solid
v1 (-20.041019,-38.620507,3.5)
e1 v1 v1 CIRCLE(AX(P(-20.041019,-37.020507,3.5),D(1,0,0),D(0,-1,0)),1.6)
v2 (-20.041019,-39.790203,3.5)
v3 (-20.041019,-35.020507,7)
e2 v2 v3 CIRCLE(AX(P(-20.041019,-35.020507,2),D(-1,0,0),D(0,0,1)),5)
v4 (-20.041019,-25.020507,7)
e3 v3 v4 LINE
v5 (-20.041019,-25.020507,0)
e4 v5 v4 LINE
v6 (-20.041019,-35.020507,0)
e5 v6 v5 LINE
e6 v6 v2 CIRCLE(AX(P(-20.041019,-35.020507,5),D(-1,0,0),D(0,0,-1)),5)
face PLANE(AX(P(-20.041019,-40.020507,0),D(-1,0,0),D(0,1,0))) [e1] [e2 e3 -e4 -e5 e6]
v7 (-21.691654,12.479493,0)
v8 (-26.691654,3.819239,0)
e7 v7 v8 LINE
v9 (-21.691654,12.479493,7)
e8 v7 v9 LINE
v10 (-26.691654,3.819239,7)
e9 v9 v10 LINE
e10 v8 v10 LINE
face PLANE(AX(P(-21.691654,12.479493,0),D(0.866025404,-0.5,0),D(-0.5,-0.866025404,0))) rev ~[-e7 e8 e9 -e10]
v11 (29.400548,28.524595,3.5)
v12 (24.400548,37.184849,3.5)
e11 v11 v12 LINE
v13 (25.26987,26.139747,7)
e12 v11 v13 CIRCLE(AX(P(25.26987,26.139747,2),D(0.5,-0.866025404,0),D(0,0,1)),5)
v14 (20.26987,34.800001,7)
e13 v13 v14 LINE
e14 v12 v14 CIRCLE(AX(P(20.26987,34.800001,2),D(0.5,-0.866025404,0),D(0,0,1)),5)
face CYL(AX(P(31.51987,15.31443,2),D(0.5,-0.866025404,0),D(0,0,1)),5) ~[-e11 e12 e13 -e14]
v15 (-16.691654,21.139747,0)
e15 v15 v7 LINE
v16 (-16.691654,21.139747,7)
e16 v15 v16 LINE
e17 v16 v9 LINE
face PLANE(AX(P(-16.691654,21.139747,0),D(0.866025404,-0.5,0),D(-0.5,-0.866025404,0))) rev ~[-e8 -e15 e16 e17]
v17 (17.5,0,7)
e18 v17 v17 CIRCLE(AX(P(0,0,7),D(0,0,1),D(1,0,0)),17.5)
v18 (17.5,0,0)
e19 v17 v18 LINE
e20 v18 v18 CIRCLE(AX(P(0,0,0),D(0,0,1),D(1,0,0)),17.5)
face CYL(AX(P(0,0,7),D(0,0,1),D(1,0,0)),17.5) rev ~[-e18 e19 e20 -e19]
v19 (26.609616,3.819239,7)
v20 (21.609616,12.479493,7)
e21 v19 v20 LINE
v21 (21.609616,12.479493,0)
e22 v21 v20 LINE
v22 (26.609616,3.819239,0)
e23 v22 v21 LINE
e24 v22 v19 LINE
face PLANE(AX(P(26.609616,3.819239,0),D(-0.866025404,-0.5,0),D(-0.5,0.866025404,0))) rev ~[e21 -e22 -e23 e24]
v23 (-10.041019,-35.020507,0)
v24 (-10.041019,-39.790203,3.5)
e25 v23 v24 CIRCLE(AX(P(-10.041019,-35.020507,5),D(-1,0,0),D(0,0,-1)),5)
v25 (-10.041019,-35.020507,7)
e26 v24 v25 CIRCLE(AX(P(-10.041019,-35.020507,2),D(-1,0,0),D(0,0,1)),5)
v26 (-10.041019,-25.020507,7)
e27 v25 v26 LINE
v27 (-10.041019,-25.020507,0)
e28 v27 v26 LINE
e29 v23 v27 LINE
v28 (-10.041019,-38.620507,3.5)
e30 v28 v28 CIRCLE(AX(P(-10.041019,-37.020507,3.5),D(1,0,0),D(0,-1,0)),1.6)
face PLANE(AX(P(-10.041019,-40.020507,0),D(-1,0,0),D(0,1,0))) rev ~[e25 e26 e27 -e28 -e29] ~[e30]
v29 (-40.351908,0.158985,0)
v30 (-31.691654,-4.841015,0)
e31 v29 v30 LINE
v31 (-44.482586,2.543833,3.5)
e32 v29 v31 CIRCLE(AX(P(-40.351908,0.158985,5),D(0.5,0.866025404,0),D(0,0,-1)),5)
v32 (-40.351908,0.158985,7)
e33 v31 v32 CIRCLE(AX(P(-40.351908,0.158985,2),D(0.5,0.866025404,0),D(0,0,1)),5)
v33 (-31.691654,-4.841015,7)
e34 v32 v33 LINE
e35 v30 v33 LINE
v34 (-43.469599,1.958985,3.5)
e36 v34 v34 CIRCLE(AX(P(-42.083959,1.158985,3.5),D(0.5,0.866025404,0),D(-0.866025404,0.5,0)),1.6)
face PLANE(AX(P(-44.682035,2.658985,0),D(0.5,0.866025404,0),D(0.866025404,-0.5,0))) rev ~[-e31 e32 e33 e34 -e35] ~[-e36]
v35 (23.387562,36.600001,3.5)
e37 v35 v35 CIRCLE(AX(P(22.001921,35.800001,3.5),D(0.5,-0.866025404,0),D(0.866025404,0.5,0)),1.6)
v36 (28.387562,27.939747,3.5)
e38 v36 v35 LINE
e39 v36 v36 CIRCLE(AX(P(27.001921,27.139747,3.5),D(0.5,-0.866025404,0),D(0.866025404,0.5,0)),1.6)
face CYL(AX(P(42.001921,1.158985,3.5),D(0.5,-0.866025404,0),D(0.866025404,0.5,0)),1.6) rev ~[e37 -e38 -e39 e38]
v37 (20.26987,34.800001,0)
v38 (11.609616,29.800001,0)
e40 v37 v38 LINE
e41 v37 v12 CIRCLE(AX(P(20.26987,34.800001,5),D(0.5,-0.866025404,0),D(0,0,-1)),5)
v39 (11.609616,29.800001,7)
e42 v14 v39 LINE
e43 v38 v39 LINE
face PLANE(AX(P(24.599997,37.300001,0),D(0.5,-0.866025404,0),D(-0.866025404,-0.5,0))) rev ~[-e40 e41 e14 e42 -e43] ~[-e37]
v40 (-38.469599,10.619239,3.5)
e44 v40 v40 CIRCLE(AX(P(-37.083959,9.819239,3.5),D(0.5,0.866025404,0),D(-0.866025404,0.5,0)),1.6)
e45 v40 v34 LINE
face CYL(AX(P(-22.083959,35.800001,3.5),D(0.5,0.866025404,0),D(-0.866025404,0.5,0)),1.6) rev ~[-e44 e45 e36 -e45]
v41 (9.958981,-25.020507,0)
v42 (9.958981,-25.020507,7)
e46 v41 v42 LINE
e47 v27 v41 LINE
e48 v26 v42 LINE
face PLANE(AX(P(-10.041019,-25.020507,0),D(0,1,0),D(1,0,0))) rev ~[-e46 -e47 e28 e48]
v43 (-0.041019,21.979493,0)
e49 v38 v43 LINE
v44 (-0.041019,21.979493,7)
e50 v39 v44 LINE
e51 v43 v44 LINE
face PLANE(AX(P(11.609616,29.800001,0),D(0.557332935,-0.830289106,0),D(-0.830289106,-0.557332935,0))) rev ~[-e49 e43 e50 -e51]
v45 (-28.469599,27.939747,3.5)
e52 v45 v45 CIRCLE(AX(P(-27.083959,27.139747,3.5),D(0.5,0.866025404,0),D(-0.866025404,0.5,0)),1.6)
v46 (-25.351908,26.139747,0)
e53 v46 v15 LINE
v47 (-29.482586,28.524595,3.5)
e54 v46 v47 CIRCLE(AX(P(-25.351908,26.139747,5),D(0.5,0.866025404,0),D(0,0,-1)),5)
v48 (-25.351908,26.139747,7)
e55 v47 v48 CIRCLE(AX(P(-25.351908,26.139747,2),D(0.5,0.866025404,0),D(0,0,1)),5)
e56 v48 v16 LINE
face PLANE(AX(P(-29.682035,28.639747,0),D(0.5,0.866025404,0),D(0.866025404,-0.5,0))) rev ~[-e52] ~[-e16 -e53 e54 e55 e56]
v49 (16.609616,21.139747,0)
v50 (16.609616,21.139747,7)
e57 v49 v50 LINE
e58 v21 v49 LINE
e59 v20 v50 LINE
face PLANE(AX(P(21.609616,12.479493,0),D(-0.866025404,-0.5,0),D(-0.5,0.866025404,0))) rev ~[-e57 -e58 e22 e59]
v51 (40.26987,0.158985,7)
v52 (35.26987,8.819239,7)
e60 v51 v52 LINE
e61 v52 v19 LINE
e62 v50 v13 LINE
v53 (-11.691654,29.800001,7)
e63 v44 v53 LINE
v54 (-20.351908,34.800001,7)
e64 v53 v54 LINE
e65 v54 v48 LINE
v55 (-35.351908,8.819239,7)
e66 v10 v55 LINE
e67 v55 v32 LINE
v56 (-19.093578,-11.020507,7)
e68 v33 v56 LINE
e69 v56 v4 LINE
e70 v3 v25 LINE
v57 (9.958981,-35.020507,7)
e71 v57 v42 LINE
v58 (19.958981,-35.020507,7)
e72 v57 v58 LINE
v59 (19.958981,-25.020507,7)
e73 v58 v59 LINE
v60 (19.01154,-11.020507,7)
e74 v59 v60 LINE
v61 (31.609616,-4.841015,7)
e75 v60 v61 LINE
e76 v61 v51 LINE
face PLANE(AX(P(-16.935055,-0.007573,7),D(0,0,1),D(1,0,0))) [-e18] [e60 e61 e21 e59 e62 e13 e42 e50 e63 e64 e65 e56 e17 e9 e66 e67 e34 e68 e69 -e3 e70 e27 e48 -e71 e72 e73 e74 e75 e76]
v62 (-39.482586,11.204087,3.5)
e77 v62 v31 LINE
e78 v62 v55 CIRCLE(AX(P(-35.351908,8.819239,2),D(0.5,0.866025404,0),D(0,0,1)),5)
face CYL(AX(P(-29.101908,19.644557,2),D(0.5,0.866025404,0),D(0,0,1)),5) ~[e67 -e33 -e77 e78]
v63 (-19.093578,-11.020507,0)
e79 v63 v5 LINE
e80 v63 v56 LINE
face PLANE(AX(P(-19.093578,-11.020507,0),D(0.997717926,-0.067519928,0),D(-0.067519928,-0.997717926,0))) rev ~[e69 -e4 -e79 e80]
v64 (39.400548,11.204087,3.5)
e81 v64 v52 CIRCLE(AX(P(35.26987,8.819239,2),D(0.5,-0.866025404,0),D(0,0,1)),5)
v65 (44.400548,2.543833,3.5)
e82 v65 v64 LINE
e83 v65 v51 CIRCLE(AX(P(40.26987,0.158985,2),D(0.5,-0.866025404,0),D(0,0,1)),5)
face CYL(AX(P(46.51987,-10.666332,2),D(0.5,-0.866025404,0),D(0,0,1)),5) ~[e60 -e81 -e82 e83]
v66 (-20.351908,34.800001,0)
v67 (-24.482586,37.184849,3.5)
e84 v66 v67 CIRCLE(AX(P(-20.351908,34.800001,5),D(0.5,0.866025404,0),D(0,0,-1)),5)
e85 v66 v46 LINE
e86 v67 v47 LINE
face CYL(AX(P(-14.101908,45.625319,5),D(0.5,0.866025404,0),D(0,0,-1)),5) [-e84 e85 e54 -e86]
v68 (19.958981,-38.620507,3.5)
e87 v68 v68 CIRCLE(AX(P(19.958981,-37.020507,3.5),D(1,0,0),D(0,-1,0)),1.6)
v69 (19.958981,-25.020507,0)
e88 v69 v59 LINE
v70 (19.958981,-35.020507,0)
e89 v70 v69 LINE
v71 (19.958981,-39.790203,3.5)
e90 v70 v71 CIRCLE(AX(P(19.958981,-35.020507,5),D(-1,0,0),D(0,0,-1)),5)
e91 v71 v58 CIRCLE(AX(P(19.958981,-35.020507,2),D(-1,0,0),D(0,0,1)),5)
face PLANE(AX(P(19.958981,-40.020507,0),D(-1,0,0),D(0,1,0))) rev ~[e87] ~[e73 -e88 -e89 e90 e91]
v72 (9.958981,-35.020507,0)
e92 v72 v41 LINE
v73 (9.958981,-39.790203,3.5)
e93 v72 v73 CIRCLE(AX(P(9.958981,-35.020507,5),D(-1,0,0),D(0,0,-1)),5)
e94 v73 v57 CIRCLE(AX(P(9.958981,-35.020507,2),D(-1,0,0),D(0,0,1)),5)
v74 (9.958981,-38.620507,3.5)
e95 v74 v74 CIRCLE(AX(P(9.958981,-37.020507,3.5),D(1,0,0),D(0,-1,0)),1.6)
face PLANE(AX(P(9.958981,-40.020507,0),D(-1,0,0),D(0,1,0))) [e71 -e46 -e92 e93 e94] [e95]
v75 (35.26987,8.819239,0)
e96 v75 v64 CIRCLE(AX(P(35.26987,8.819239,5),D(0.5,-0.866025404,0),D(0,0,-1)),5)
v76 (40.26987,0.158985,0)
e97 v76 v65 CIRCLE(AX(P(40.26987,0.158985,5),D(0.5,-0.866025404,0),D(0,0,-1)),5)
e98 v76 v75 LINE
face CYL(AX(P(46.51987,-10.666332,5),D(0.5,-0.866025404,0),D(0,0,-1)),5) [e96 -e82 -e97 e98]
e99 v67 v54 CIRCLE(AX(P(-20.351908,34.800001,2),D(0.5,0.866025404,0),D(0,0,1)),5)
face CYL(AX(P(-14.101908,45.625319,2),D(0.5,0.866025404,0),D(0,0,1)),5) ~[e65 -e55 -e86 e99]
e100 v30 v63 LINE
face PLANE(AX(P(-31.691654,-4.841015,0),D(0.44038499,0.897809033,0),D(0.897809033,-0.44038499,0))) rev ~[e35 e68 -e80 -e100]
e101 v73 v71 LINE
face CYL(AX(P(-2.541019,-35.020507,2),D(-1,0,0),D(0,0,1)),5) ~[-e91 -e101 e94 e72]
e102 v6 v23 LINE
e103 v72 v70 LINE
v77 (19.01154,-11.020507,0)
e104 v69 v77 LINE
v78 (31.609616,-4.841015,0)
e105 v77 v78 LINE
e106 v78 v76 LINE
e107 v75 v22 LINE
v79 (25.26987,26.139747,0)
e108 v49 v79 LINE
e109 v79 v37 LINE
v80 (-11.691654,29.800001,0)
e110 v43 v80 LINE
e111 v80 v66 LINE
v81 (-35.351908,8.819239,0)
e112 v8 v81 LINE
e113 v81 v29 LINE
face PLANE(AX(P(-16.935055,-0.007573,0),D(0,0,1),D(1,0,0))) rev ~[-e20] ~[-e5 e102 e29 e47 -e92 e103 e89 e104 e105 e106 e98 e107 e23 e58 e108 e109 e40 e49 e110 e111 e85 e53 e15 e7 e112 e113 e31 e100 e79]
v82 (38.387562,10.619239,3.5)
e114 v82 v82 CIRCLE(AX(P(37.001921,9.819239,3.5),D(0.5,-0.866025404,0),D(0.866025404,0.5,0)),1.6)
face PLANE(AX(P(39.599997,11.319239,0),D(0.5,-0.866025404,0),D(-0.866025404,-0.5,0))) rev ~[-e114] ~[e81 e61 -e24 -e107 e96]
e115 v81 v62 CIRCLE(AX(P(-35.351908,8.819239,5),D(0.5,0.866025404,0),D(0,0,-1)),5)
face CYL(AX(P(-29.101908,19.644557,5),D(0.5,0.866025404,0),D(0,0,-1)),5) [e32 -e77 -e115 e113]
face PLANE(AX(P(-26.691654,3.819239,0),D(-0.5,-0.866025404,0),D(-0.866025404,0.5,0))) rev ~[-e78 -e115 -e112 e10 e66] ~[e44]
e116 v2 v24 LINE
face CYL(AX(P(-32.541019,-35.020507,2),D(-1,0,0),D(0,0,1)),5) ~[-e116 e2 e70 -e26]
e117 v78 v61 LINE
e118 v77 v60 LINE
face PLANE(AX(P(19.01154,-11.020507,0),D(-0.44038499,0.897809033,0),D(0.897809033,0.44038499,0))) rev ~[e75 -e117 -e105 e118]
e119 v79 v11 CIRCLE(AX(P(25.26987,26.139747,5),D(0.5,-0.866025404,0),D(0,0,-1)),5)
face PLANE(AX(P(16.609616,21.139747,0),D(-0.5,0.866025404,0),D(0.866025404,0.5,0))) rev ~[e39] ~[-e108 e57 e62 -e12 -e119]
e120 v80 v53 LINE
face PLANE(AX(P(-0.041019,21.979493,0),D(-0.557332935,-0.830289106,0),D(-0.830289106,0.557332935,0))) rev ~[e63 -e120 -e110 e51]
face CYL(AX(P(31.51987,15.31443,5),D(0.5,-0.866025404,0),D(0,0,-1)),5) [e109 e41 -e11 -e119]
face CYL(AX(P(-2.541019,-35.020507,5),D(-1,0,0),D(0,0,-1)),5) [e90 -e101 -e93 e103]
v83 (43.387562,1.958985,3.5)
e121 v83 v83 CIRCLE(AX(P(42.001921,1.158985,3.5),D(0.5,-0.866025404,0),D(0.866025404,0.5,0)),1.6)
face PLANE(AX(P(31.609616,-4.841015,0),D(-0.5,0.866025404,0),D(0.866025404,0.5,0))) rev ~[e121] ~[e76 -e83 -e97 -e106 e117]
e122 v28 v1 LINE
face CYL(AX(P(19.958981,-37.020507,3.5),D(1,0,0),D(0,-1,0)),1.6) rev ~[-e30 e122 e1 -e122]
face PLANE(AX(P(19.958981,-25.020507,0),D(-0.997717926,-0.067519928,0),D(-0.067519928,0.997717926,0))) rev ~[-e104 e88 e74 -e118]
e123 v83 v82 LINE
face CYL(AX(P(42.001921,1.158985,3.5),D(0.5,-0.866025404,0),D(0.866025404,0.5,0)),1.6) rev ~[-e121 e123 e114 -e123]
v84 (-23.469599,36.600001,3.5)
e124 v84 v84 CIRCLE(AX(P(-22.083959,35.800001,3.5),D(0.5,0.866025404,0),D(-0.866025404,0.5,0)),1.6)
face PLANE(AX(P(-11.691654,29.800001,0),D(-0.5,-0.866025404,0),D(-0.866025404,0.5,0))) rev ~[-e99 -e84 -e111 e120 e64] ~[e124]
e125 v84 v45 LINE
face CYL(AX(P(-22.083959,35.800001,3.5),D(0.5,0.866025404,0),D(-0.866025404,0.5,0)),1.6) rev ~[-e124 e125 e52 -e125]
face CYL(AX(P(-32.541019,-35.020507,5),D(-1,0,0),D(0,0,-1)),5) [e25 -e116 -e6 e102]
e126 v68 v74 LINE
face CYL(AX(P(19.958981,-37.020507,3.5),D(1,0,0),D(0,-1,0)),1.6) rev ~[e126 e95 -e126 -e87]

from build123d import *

# Parameters (mm, degrees)
F0_W          = 10
F0_H          = 15
F1_DEPTH      = 7
F3_DEPTH      = 60
F4_R          = 1.6
F5_DEPTH      = 60
F6_R          = 1.6
F7_DEPTH      = 60
F8_R          = 17.5
F9_DEPTH      = 25
F10_T1_DEPTH  = 35
F10_T3_DEPTH  = 35
F10_T5_DEPTH  = 35
F10_T7_DEPTH  = 35
F10_T9_DEPTH  = 35
F10_T11_DEPTH = 35


# Not quite as in the source:
# - a fillet or chamfer that OpenCascade refuses, or shapes differently, is made with other operations: its cross-section is extruded or revolved along the edge and cut away or added
# - a feature names something its author has since deleted; it is built from what else it names


with BuildPart() as f1:
    # F0 (on Top) → F1 (new body)
    with BuildSketch(Plane.XY):
        Polygon((-19.0935776077, -11.020506829), (-0.0410187244, -0.020506829), (-21.6916538191, 12.479493171), (-26.6916538191, 3.8192391331), (-31.6916538191, -4.8410149047), align=None)
        Polygon((-0.0410187244, 21.979493171), (-0.0410187244, -0.020506829), (21.6096163702, 12.479493171), (16.6096163702, 21.1397472088), (11.6096163702, 29.8000012467), align=None)
        Polygon((19.0115401588, -11.020506829), (-0.0410187244, -0.020506829), (-0.0410187244, -25.020506829), (9.9589812756, -25.020506829), (19.9589812756, -25.020506829), align=None)
        Polygon((-0.0410187244, -25.020506829), (-0.0410187244, -0.020506829), (-19.0935776077, -11.020506829), (-20.0410187244, -25.020506829), (-10.0410187244, -25.020506829), align=None)
        Polygon((-21.6916538191, 12.479493171), (-0.0410187244, -0.020506829), (-0.0410187244, 21.979493171), (-11.6916538191, 29.8000012467), (-16.6916538191, 21.1397472088), align=None)
        Polygon((21.6096163702, 12.479493171), (-0.0410187244, -0.020506829), (19.0115401588, -11.020506829), (31.6096163702, -4.8410149047), (26.6096163702, 3.8192391331), align=None)
        Polygon((-29.6820348758, 28.6397472088), (-16.6916538191, 21.1397472088), (-11.6916538191, 29.8000012467), (-24.6820348758, 37.3000012467), align=None)
        Polygon((-31.6916538191, -4.8410149047), (-26.6916538191, 3.8192391331), (-39.6820348758, 11.3192391331), (-44.6820348758, 2.6589850953), align=None)
        Polygon((39.5999974269, 11.3192391331), (26.6096163702, 3.8192391331), (31.6096163702, -4.8410149047), (44.5999974269, 2.6589850953), align=None)
        Polygon((11.6096163702, 29.8000012467), (16.6096163702, 21.1397472088), (29.5999974269, 28.6397472088), (24.5999974269, 37.3000012467), align=None)
        with Locations((-15.0410187244, -32.520506829)):
            Rectangle(F0_W, F0_H)
        with Locations((14.9589812756, -32.520506829)):
            Rectangle(F0_W, F0_H)
    extrude(amount=F1_DEPTH)

    # F2 (on face) → F3 (cut)
    with BuildSketch(Plane.YZ.offset(19.9589812756)):
        with BuildLine():
            ThreePointArc((-35.420506829, 3.5), (-37.020506829, 5.1), (-38.620506829, 3.5))
            ThreePointArc((-38.620506829, 3.5), (-37.020506829, 1.9), (-35.420506829, 3.5))
        make_face()
    extrude(amount=-F3_DEPTH, mode=Mode.SUBTRACT)

    # F4 (on face) → F5 (cut)
    with BuildSketch(Plane(origin=(9.9986250363, -17.3181265688, 0), x_dir=(0.8660254038, 0.5, 0), z_dir=(0.5, -0.8660254038, 0))):
        with Locations((36.9542233281, 3.5)):
            Circle(F4_R)
    extrude(amount=-F5_DEPTH, mode=Mode.SUBTRACT)

    # F6 (on face) → F7 (cut)
    with BuildSketch(Plane(origin=(9.9808656014, 17.2873663252, 0), x_dir=(-0.8660254038, 0.5, 0), z_dir=(0.5, 0.8660254038, 0))):
        with Locations((37.0252698429, 3.5)):
            Circle(F6_R)
    extrude(amount=-F7_DEPTH, mode=Mode.SUBTRACT)

    # F8 (on face) → F9 (cut)
    with BuildSketch(Plane.XY.offset(7)):
        Circle(F8_R)
    extrude(amount=-F9_DEPTH, mode=Mode.SUBTRACT)

    # F10: fillet of radius 5 on 12 edges, made by hand

    # F10_s2 → F10_t1 (cut)
    with BuildSketch(Plane.YZ.offset(-32.5410187244)):
        with BuildLine():
            ThreePointArc((-35.020506829, 7), (-38.556040735, 5.5355339059), (-40.020506829, 2))
            Line((-40.020506829, 2), (-40.020506829, 7))
            Line((-40.020506829, 7), (-35.020506829, 7))
        make_face()
        with BuildLine():
            ThreePointArc((-35.020506829, 0), (-38.556040735, 1.4644660941), (-40.020506829, 5))
            Line((-40.020506829, 5), (-40.020506829, 0))
            Line((-40.020506829, 0), (-35.020506829, 0))
        make_face()
    extrude(amount=F10_T1_DEPTH, mode=Mode.SUBTRACT)

    # F10_s4 → F10_t3 (cut)
    with BuildSketch(Plane.YZ.offset(-2.5410187244)):
        with BuildLine():
            ThreePointArc((-35.020506829, 0), (-38.556040735, 1.4644660941), (-40.020506829, 5))
            Line((-40.020506829, 5), (-40.020506829, 0))
            Line((-40.020506829, 0), (-35.020506829, 0))
        make_face()
        with BuildLine():
            ThreePointArc((-35.020506829, 7), (-38.556040735, 5.5355339059), (-40.020506829, 2))
            Line((-40.020506829, 2), (-40.020506829, 7))
            Line((-40.020506829, 7), (-35.020506829, 7))
        make_face()
    extrude(amount=F10_T3_DEPTH, mode=Mode.SUBTRACT)

    # F10_s6 → F10_t5 (cut)
    with BuildSketch(Plane(origin=(16.2486250363, -28.1434441161, 0), x_dir=(0, 0, 1), z_dir=(-0.5, 0.8660254038, 0))):
        with BuildLine():
            ThreePointArc((7, 34.9542233281), (5.5355339059, 38.489757234), (2, 39.9542233281))
            Line((2, 39.9542233281), (7, 39.9542233281))
            Line((7, 39.9542233281), (7, 34.9542233281))
        make_face()
        with BuildLine():
            ThreePointArc((0, 34.9542233281), (1.4644660941, 38.489757234), (5, 39.9542233281))
            Line((5, 39.9542233281), (0, 39.9542233281))
            Line((0, 39.9542233281), (0, 34.9542233281))
        make_face()
    extrude(amount=F10_T5_DEPTH, mode=Mode.SUBTRACT)

    # F10_s8 → F10_t7 (cut)
    with BuildSketch(Plane(origin=(1.2486250363, -2.1626820025, 0), x_dir=(0, 0, 1), z_dir=(-0.5, 0.8660254038, 0))):
        with BuildLine():
            ThreePointArc((7, 34.9542233281), (5.5355339059, 38.489757234), (2, 39.9542233281))
            Line((2, 39.9542233281), (7, 39.9542233281))
            Line((7, 39.9542233281), (7, 34.9542233281))
        make_face()
        with BuildLine():
            ThreePointArc((0, 34.9542233281), (1.4644660941, 38.489757234), (5, 39.9542233281))
            Line((5, 39.9542233281), (0, 39.9542233281))
            Line((0, 39.9542233281), (0, 34.9542233281))
        make_face()
    extrude(amount=F10_T7_DEPTH, mode=Mode.SUBTRACT)

    # F10_s10 → F10_t9 (cut)
    with BuildSketch(Plane(origin=(16.2308656014, 28.1126838725, 0), x_dir=(0, 0, 1), z_dir=(-0.5, -0.8660254038, 0))):
        with BuildLine():
            ThreePointArc((7, 35.0252698429), (5.5355339059, 38.5608037488), (2, 40.0252698429))
            Line((2, 40.0252698429), (7, 40.0252698429))
            Line((7, 40.0252698429), (7, 35.0252698429))
        make_face()
        with BuildLine():
            ThreePointArc((0, 35.0252698429), (1.4644660941, 38.5608037488), (5, 40.0252698429))
            Line((5, 40.0252698429), (0, 40.0252698429))
            Line((0, 40.0252698429), (0, 35.0252698429))
        make_face()
    extrude(amount=F10_T9_DEPTH, mode=Mode.SUBTRACT)

    # F10_s12 → F10_t11 (cut)
    with BuildSketch(Plane(origin=(1.2308656014, 2.131921759, 0), x_dir=(0, 0, 1), z_dir=(-0.5, -0.8660254038, 0))):
        with BuildLine():
            ThreePointArc((7, 35.0252698429), (5.5355339059, 38.5608037488), (2, 40.0252698429))
            Line((2, 40.0252698429), (7, 40.0252698429))
            Line((7, 40.0252698429), (7, 35.0252698429))
        make_face()
        with BuildLine():
            ThreePointArc((0, 35.0252698429), (1.4644660941, 38.5608037488), (5, 40.0252698429))
            Line((5, 40.0252698429), (0, 40.0252698429))
            Line((0, 40.0252698429), (0, 35.0252698429))
        make_face()
    extrude(amount=F10_T11_DEPTH, mode=Mode.SUBTRACT)


solid = f1.part
